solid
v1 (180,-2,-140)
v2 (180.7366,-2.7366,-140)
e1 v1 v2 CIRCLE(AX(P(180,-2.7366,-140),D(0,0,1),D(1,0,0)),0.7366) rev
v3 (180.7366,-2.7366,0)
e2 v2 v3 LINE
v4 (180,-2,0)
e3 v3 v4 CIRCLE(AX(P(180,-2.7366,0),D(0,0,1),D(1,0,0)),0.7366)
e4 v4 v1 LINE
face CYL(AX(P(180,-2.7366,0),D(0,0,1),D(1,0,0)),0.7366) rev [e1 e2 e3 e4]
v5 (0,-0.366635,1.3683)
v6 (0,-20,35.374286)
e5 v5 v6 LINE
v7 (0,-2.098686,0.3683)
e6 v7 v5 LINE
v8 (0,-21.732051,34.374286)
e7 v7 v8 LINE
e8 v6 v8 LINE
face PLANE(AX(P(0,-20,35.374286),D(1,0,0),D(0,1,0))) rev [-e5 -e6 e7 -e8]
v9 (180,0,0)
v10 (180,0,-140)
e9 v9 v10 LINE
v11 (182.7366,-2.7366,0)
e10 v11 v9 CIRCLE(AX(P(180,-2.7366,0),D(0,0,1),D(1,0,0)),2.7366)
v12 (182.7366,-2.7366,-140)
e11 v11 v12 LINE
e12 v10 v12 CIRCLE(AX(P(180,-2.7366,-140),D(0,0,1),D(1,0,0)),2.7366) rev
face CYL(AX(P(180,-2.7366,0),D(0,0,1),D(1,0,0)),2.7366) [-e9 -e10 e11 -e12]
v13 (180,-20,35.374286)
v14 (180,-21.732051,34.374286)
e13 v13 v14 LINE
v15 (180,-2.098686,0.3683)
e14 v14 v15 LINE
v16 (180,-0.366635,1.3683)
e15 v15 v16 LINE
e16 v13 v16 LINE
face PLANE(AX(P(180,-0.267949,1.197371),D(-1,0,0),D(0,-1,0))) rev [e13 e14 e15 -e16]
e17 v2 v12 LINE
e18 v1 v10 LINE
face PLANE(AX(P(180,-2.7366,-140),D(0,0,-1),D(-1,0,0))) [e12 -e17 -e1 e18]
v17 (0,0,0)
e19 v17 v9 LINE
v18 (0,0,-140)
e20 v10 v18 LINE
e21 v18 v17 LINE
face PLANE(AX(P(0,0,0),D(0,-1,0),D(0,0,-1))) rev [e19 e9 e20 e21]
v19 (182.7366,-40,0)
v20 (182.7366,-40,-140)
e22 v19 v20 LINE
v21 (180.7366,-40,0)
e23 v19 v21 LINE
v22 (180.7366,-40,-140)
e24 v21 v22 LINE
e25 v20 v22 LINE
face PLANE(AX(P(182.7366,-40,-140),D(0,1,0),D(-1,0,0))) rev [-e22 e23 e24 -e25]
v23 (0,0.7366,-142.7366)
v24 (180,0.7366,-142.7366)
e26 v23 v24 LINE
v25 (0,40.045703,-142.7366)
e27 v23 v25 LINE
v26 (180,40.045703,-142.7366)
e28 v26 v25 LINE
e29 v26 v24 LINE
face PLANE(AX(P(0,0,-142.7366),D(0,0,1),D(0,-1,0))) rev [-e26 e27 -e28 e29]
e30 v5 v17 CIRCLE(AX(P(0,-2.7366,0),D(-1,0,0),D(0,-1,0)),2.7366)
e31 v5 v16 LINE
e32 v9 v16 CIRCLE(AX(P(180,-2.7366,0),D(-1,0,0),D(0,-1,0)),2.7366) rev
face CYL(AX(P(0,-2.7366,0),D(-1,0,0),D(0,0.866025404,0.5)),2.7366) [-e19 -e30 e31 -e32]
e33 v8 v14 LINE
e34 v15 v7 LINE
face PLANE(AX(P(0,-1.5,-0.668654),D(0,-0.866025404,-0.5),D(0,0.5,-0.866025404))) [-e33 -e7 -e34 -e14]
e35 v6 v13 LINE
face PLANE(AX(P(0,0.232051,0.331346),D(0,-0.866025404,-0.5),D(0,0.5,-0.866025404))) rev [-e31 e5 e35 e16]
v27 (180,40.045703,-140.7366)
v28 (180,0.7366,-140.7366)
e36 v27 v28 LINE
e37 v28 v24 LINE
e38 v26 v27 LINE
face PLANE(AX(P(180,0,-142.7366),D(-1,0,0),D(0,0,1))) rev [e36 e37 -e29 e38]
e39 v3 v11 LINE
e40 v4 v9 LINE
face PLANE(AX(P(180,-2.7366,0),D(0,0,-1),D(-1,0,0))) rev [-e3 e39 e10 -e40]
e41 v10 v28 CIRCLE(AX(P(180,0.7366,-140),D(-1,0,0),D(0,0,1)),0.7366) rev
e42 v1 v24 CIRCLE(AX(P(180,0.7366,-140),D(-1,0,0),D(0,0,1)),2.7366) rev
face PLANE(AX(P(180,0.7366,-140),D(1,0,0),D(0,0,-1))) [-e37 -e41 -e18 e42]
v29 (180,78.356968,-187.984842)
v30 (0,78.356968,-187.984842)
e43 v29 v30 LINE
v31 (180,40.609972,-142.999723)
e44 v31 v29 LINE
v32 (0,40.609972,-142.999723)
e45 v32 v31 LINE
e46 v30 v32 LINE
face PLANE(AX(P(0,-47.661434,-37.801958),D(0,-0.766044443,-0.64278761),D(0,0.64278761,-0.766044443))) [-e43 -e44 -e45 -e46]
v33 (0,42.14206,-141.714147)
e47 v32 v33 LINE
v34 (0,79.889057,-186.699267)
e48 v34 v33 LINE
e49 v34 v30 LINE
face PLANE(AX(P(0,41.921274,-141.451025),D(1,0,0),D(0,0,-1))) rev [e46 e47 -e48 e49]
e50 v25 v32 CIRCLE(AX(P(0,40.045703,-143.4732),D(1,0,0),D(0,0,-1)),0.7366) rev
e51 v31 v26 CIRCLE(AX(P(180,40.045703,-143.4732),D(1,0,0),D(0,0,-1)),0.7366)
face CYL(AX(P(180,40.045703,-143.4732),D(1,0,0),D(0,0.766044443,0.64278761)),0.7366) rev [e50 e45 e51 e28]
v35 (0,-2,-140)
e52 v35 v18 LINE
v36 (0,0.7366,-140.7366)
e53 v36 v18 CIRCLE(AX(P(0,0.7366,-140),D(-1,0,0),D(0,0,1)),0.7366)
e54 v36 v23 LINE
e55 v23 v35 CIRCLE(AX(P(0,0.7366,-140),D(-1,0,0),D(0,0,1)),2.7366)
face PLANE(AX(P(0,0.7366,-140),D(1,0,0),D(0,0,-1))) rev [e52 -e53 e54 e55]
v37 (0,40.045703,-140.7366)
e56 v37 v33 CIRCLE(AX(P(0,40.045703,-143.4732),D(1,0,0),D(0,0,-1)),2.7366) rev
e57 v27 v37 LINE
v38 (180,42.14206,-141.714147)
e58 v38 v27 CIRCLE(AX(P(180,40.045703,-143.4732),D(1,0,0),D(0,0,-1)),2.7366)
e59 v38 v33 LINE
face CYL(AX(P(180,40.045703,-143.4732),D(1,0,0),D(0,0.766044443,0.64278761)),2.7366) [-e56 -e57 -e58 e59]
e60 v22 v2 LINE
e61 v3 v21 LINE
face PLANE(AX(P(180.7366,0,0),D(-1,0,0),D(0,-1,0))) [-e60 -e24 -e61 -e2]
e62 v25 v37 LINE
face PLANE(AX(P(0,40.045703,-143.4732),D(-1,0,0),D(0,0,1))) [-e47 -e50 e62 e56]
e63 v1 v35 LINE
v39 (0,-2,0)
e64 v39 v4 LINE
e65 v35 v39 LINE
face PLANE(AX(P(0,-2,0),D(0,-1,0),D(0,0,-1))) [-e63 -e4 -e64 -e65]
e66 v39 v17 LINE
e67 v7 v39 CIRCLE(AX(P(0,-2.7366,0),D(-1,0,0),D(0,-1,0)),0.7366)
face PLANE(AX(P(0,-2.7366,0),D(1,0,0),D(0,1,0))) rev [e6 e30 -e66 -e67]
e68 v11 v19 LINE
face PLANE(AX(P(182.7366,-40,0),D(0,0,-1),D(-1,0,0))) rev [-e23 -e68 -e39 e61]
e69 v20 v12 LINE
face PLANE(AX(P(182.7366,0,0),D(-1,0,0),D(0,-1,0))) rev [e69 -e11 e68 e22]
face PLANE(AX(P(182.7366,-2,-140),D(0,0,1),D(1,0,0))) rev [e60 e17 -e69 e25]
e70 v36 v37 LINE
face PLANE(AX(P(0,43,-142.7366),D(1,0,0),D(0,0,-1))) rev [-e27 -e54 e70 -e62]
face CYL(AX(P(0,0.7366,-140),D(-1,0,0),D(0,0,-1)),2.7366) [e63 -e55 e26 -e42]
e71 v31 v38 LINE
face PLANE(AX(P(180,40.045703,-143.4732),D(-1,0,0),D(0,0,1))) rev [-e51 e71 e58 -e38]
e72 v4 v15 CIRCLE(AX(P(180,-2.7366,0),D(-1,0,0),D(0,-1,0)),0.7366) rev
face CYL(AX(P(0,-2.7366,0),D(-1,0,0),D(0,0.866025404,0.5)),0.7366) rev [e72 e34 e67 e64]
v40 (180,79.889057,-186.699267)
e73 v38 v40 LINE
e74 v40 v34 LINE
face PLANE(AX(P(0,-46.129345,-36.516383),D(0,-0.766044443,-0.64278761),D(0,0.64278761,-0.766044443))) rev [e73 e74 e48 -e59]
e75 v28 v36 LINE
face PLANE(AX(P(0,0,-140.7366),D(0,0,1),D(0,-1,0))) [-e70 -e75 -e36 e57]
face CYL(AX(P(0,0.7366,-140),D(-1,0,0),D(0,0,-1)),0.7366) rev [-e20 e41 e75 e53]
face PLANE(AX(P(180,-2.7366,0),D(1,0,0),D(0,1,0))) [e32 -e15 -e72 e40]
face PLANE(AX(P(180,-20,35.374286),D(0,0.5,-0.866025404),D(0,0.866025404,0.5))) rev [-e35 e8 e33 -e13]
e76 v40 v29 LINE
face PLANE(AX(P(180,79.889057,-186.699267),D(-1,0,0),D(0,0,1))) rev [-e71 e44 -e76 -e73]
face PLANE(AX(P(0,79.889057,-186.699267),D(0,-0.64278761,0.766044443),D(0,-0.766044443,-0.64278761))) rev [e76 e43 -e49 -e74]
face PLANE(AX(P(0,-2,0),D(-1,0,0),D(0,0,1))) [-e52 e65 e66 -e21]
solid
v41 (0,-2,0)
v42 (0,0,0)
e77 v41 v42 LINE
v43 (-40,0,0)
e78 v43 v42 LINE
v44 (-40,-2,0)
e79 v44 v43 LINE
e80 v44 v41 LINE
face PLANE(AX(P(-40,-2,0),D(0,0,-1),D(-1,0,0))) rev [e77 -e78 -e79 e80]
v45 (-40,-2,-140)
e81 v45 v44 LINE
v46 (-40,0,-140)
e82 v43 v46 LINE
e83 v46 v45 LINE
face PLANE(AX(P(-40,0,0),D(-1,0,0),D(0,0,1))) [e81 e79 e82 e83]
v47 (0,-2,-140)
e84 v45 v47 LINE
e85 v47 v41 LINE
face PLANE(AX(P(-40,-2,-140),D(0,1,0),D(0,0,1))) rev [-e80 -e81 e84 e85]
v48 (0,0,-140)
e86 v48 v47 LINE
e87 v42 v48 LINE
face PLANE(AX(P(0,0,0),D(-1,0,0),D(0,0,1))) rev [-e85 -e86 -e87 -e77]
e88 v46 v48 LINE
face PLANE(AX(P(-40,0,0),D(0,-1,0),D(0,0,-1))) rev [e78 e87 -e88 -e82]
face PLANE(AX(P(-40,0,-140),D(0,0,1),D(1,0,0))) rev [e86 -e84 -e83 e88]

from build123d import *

# Parameters (mm, degrees)
SKETCH1_W            = 180
SKETCH1_H            = 140
BASE_FLANGE2_DEPTH   = 2
EDGE_FLANGE3_DEPTH   = 140
SKETCH19_W           = 140
SKETCH19_H           = 2
BOSS_EXTRUDE1_DEPTH  = 40
EDGE_FLANGE4_DEPTH   = 180
EDGE_FLANGE5_DEPTH   = 180
EDGE_FLANGE6_DEPTH   = 180
EDGE_FLANGE6_2_DEPTH = 180


# Read off the part's stored shape, not the designer's step: Edge-Flange6
# Sheet-metal steps are written as plain solids
with BuildPart() as part:
    # Sketch1 → Base-Flange2 (new body)
    with BuildSketch(Plane(origin=(0, 0, 0), x_dir=(1, 0, 0), z_dir=(0, 1, 0))):
        with Locations((90, 70)):
            Rectangle(SKETCH1_W, SKETCH1_H)
    extrude(amount=-BASE_FLANGE2_DEPTH)

    # Edge-Flange3 section (across the edge) → Edge-Flange3 (add)
    with BuildSketch(Plane(origin=(180.7366, -2, -140), x_dir=(-1, 0, 0), z_dir=(0, 0, 1))):
        with BuildLine():
            Line((-2, 0.7366), (-2, 38))
            Line((-2, 38), (0, 38))
            Line((0, 38), (0, 0.7366))
            ThreePointArc((0, 0.7366), (0.215745145, 0.215745145), (0.7366, 0))
            Line((0.7366, 0), (0.7366, -2))
            ThreePointArc((0.7366, -2), (-1.198468417, -1.198468417), (-2, 0.7366))
        make_face()
    extrude(amount=EDGE_FLANGE3_DEPTH)

    # Edge-Flange4 section (across the edge) → Edge-Flange4 (add)
    with BuildSketch(Plane(origin=(180, -2, 0.197371375), x_dir=(0, -0.8660254037844416, -0.49999999999999495), z_dir=(-1, 0, 0))):
        with BuildLine():
            Line((-2, 0.197371375), (-2, 39.464101615))
            Line((-2, 39.464101615), (0, 39.464101615))
            Line((0, 39.464101615), (0, 0.197371375))
            ThreePointArc((0, 0.197371375), (0.025099036, 0.006725267), (0.098685688, -0.170928625))
            Line((0.098685688, -0.170928625), (-1.63336512, -1.170928625))
            ThreePointArc((-1.63336512, -1.170928625), (-1.906752616, -0.510912824), (-2, 0.197371375))
        make_face()
    extrude(amount=EDGE_FLANGE4_DEPTH)

    # Edge-Flange5 section (across the edge) → Edge-Flange5 (add)
    with BuildSketch(Plane(origin=(180, 0, -140.7366), x_dir=(0, 0, 1), z_dir=(-1, 0, 0))):
        with BuildLine():
            Line((-2, 0.7366), (-2, 43))
            Line((-2, 43), (0, 43))
            Line((0, 43), (0, 0.7366))
            ThreePointArc((0, 0.7366), (0.215745145, 0.215745145), (0.7366, 0))
            Line((0.7366, 0), (0.7366, -2))
            ThreePointArc((0.7366, -2), (-1.198468417, -1.198468417), (-2, 0.7366))
        make_face()
    extrude(amount=EDGE_FLANGE5_DEPTH)

    # Edge-Flange6 outline → Edge-Flange6 (cut)
    with BuildSketch(Plane.YZ):
        with BuildLine():
            ThreePointArc((40.0457032, -140.7366), (41.202240335, -140.99299811), (42.142060423, -141.714147427))
            Line((42.142060423, -141.714147427), (43, -142.7366))
            Line((43, -142.7366), (43, -140.7366))
            Line((43, -140.7366), (40.0457032, -140.7366))
        make_face()
    extrude(amount=EDGE_FLANGE6_DEPTH, mode=Mode.SUBTRACT)

    # Edge-Flange6 2 outline → Edge-Flange6 2 (add)
    with BuildSketch(Plane.YZ):
        with BuildLine():
            Line((79.889057319, -186.699266587), (43, -142.7366))
            Line((43, -142.7366), (40.0457032, -142.7366))
            ThreePointArc((40.0457032, -142.7366), (40.357003812, -142.805613684), (40.609971537, -142.999722647))
            Line((40.609971537, -142.999722647), (78.356968433, -187.984841807))
            Line((78.356968433, -187.984841807), (79.889057319, -186.699266587))
        make_face()
    extrude(amount=EDGE_FLANGE6_2_DEPTH)


with BuildPart() as body_2:
    # Sketch19 → Boss-Extrude1 (new body)
    with BuildSketch(Plane.ZY):
        with Locations((-70, -1)):
            Rectangle(SKETCH19_W, SKETCH19_H)
    extrude(amount=BOSS_EXTRUDE1_DEPTH)


solid = Compound([part.part, body_2.part])
